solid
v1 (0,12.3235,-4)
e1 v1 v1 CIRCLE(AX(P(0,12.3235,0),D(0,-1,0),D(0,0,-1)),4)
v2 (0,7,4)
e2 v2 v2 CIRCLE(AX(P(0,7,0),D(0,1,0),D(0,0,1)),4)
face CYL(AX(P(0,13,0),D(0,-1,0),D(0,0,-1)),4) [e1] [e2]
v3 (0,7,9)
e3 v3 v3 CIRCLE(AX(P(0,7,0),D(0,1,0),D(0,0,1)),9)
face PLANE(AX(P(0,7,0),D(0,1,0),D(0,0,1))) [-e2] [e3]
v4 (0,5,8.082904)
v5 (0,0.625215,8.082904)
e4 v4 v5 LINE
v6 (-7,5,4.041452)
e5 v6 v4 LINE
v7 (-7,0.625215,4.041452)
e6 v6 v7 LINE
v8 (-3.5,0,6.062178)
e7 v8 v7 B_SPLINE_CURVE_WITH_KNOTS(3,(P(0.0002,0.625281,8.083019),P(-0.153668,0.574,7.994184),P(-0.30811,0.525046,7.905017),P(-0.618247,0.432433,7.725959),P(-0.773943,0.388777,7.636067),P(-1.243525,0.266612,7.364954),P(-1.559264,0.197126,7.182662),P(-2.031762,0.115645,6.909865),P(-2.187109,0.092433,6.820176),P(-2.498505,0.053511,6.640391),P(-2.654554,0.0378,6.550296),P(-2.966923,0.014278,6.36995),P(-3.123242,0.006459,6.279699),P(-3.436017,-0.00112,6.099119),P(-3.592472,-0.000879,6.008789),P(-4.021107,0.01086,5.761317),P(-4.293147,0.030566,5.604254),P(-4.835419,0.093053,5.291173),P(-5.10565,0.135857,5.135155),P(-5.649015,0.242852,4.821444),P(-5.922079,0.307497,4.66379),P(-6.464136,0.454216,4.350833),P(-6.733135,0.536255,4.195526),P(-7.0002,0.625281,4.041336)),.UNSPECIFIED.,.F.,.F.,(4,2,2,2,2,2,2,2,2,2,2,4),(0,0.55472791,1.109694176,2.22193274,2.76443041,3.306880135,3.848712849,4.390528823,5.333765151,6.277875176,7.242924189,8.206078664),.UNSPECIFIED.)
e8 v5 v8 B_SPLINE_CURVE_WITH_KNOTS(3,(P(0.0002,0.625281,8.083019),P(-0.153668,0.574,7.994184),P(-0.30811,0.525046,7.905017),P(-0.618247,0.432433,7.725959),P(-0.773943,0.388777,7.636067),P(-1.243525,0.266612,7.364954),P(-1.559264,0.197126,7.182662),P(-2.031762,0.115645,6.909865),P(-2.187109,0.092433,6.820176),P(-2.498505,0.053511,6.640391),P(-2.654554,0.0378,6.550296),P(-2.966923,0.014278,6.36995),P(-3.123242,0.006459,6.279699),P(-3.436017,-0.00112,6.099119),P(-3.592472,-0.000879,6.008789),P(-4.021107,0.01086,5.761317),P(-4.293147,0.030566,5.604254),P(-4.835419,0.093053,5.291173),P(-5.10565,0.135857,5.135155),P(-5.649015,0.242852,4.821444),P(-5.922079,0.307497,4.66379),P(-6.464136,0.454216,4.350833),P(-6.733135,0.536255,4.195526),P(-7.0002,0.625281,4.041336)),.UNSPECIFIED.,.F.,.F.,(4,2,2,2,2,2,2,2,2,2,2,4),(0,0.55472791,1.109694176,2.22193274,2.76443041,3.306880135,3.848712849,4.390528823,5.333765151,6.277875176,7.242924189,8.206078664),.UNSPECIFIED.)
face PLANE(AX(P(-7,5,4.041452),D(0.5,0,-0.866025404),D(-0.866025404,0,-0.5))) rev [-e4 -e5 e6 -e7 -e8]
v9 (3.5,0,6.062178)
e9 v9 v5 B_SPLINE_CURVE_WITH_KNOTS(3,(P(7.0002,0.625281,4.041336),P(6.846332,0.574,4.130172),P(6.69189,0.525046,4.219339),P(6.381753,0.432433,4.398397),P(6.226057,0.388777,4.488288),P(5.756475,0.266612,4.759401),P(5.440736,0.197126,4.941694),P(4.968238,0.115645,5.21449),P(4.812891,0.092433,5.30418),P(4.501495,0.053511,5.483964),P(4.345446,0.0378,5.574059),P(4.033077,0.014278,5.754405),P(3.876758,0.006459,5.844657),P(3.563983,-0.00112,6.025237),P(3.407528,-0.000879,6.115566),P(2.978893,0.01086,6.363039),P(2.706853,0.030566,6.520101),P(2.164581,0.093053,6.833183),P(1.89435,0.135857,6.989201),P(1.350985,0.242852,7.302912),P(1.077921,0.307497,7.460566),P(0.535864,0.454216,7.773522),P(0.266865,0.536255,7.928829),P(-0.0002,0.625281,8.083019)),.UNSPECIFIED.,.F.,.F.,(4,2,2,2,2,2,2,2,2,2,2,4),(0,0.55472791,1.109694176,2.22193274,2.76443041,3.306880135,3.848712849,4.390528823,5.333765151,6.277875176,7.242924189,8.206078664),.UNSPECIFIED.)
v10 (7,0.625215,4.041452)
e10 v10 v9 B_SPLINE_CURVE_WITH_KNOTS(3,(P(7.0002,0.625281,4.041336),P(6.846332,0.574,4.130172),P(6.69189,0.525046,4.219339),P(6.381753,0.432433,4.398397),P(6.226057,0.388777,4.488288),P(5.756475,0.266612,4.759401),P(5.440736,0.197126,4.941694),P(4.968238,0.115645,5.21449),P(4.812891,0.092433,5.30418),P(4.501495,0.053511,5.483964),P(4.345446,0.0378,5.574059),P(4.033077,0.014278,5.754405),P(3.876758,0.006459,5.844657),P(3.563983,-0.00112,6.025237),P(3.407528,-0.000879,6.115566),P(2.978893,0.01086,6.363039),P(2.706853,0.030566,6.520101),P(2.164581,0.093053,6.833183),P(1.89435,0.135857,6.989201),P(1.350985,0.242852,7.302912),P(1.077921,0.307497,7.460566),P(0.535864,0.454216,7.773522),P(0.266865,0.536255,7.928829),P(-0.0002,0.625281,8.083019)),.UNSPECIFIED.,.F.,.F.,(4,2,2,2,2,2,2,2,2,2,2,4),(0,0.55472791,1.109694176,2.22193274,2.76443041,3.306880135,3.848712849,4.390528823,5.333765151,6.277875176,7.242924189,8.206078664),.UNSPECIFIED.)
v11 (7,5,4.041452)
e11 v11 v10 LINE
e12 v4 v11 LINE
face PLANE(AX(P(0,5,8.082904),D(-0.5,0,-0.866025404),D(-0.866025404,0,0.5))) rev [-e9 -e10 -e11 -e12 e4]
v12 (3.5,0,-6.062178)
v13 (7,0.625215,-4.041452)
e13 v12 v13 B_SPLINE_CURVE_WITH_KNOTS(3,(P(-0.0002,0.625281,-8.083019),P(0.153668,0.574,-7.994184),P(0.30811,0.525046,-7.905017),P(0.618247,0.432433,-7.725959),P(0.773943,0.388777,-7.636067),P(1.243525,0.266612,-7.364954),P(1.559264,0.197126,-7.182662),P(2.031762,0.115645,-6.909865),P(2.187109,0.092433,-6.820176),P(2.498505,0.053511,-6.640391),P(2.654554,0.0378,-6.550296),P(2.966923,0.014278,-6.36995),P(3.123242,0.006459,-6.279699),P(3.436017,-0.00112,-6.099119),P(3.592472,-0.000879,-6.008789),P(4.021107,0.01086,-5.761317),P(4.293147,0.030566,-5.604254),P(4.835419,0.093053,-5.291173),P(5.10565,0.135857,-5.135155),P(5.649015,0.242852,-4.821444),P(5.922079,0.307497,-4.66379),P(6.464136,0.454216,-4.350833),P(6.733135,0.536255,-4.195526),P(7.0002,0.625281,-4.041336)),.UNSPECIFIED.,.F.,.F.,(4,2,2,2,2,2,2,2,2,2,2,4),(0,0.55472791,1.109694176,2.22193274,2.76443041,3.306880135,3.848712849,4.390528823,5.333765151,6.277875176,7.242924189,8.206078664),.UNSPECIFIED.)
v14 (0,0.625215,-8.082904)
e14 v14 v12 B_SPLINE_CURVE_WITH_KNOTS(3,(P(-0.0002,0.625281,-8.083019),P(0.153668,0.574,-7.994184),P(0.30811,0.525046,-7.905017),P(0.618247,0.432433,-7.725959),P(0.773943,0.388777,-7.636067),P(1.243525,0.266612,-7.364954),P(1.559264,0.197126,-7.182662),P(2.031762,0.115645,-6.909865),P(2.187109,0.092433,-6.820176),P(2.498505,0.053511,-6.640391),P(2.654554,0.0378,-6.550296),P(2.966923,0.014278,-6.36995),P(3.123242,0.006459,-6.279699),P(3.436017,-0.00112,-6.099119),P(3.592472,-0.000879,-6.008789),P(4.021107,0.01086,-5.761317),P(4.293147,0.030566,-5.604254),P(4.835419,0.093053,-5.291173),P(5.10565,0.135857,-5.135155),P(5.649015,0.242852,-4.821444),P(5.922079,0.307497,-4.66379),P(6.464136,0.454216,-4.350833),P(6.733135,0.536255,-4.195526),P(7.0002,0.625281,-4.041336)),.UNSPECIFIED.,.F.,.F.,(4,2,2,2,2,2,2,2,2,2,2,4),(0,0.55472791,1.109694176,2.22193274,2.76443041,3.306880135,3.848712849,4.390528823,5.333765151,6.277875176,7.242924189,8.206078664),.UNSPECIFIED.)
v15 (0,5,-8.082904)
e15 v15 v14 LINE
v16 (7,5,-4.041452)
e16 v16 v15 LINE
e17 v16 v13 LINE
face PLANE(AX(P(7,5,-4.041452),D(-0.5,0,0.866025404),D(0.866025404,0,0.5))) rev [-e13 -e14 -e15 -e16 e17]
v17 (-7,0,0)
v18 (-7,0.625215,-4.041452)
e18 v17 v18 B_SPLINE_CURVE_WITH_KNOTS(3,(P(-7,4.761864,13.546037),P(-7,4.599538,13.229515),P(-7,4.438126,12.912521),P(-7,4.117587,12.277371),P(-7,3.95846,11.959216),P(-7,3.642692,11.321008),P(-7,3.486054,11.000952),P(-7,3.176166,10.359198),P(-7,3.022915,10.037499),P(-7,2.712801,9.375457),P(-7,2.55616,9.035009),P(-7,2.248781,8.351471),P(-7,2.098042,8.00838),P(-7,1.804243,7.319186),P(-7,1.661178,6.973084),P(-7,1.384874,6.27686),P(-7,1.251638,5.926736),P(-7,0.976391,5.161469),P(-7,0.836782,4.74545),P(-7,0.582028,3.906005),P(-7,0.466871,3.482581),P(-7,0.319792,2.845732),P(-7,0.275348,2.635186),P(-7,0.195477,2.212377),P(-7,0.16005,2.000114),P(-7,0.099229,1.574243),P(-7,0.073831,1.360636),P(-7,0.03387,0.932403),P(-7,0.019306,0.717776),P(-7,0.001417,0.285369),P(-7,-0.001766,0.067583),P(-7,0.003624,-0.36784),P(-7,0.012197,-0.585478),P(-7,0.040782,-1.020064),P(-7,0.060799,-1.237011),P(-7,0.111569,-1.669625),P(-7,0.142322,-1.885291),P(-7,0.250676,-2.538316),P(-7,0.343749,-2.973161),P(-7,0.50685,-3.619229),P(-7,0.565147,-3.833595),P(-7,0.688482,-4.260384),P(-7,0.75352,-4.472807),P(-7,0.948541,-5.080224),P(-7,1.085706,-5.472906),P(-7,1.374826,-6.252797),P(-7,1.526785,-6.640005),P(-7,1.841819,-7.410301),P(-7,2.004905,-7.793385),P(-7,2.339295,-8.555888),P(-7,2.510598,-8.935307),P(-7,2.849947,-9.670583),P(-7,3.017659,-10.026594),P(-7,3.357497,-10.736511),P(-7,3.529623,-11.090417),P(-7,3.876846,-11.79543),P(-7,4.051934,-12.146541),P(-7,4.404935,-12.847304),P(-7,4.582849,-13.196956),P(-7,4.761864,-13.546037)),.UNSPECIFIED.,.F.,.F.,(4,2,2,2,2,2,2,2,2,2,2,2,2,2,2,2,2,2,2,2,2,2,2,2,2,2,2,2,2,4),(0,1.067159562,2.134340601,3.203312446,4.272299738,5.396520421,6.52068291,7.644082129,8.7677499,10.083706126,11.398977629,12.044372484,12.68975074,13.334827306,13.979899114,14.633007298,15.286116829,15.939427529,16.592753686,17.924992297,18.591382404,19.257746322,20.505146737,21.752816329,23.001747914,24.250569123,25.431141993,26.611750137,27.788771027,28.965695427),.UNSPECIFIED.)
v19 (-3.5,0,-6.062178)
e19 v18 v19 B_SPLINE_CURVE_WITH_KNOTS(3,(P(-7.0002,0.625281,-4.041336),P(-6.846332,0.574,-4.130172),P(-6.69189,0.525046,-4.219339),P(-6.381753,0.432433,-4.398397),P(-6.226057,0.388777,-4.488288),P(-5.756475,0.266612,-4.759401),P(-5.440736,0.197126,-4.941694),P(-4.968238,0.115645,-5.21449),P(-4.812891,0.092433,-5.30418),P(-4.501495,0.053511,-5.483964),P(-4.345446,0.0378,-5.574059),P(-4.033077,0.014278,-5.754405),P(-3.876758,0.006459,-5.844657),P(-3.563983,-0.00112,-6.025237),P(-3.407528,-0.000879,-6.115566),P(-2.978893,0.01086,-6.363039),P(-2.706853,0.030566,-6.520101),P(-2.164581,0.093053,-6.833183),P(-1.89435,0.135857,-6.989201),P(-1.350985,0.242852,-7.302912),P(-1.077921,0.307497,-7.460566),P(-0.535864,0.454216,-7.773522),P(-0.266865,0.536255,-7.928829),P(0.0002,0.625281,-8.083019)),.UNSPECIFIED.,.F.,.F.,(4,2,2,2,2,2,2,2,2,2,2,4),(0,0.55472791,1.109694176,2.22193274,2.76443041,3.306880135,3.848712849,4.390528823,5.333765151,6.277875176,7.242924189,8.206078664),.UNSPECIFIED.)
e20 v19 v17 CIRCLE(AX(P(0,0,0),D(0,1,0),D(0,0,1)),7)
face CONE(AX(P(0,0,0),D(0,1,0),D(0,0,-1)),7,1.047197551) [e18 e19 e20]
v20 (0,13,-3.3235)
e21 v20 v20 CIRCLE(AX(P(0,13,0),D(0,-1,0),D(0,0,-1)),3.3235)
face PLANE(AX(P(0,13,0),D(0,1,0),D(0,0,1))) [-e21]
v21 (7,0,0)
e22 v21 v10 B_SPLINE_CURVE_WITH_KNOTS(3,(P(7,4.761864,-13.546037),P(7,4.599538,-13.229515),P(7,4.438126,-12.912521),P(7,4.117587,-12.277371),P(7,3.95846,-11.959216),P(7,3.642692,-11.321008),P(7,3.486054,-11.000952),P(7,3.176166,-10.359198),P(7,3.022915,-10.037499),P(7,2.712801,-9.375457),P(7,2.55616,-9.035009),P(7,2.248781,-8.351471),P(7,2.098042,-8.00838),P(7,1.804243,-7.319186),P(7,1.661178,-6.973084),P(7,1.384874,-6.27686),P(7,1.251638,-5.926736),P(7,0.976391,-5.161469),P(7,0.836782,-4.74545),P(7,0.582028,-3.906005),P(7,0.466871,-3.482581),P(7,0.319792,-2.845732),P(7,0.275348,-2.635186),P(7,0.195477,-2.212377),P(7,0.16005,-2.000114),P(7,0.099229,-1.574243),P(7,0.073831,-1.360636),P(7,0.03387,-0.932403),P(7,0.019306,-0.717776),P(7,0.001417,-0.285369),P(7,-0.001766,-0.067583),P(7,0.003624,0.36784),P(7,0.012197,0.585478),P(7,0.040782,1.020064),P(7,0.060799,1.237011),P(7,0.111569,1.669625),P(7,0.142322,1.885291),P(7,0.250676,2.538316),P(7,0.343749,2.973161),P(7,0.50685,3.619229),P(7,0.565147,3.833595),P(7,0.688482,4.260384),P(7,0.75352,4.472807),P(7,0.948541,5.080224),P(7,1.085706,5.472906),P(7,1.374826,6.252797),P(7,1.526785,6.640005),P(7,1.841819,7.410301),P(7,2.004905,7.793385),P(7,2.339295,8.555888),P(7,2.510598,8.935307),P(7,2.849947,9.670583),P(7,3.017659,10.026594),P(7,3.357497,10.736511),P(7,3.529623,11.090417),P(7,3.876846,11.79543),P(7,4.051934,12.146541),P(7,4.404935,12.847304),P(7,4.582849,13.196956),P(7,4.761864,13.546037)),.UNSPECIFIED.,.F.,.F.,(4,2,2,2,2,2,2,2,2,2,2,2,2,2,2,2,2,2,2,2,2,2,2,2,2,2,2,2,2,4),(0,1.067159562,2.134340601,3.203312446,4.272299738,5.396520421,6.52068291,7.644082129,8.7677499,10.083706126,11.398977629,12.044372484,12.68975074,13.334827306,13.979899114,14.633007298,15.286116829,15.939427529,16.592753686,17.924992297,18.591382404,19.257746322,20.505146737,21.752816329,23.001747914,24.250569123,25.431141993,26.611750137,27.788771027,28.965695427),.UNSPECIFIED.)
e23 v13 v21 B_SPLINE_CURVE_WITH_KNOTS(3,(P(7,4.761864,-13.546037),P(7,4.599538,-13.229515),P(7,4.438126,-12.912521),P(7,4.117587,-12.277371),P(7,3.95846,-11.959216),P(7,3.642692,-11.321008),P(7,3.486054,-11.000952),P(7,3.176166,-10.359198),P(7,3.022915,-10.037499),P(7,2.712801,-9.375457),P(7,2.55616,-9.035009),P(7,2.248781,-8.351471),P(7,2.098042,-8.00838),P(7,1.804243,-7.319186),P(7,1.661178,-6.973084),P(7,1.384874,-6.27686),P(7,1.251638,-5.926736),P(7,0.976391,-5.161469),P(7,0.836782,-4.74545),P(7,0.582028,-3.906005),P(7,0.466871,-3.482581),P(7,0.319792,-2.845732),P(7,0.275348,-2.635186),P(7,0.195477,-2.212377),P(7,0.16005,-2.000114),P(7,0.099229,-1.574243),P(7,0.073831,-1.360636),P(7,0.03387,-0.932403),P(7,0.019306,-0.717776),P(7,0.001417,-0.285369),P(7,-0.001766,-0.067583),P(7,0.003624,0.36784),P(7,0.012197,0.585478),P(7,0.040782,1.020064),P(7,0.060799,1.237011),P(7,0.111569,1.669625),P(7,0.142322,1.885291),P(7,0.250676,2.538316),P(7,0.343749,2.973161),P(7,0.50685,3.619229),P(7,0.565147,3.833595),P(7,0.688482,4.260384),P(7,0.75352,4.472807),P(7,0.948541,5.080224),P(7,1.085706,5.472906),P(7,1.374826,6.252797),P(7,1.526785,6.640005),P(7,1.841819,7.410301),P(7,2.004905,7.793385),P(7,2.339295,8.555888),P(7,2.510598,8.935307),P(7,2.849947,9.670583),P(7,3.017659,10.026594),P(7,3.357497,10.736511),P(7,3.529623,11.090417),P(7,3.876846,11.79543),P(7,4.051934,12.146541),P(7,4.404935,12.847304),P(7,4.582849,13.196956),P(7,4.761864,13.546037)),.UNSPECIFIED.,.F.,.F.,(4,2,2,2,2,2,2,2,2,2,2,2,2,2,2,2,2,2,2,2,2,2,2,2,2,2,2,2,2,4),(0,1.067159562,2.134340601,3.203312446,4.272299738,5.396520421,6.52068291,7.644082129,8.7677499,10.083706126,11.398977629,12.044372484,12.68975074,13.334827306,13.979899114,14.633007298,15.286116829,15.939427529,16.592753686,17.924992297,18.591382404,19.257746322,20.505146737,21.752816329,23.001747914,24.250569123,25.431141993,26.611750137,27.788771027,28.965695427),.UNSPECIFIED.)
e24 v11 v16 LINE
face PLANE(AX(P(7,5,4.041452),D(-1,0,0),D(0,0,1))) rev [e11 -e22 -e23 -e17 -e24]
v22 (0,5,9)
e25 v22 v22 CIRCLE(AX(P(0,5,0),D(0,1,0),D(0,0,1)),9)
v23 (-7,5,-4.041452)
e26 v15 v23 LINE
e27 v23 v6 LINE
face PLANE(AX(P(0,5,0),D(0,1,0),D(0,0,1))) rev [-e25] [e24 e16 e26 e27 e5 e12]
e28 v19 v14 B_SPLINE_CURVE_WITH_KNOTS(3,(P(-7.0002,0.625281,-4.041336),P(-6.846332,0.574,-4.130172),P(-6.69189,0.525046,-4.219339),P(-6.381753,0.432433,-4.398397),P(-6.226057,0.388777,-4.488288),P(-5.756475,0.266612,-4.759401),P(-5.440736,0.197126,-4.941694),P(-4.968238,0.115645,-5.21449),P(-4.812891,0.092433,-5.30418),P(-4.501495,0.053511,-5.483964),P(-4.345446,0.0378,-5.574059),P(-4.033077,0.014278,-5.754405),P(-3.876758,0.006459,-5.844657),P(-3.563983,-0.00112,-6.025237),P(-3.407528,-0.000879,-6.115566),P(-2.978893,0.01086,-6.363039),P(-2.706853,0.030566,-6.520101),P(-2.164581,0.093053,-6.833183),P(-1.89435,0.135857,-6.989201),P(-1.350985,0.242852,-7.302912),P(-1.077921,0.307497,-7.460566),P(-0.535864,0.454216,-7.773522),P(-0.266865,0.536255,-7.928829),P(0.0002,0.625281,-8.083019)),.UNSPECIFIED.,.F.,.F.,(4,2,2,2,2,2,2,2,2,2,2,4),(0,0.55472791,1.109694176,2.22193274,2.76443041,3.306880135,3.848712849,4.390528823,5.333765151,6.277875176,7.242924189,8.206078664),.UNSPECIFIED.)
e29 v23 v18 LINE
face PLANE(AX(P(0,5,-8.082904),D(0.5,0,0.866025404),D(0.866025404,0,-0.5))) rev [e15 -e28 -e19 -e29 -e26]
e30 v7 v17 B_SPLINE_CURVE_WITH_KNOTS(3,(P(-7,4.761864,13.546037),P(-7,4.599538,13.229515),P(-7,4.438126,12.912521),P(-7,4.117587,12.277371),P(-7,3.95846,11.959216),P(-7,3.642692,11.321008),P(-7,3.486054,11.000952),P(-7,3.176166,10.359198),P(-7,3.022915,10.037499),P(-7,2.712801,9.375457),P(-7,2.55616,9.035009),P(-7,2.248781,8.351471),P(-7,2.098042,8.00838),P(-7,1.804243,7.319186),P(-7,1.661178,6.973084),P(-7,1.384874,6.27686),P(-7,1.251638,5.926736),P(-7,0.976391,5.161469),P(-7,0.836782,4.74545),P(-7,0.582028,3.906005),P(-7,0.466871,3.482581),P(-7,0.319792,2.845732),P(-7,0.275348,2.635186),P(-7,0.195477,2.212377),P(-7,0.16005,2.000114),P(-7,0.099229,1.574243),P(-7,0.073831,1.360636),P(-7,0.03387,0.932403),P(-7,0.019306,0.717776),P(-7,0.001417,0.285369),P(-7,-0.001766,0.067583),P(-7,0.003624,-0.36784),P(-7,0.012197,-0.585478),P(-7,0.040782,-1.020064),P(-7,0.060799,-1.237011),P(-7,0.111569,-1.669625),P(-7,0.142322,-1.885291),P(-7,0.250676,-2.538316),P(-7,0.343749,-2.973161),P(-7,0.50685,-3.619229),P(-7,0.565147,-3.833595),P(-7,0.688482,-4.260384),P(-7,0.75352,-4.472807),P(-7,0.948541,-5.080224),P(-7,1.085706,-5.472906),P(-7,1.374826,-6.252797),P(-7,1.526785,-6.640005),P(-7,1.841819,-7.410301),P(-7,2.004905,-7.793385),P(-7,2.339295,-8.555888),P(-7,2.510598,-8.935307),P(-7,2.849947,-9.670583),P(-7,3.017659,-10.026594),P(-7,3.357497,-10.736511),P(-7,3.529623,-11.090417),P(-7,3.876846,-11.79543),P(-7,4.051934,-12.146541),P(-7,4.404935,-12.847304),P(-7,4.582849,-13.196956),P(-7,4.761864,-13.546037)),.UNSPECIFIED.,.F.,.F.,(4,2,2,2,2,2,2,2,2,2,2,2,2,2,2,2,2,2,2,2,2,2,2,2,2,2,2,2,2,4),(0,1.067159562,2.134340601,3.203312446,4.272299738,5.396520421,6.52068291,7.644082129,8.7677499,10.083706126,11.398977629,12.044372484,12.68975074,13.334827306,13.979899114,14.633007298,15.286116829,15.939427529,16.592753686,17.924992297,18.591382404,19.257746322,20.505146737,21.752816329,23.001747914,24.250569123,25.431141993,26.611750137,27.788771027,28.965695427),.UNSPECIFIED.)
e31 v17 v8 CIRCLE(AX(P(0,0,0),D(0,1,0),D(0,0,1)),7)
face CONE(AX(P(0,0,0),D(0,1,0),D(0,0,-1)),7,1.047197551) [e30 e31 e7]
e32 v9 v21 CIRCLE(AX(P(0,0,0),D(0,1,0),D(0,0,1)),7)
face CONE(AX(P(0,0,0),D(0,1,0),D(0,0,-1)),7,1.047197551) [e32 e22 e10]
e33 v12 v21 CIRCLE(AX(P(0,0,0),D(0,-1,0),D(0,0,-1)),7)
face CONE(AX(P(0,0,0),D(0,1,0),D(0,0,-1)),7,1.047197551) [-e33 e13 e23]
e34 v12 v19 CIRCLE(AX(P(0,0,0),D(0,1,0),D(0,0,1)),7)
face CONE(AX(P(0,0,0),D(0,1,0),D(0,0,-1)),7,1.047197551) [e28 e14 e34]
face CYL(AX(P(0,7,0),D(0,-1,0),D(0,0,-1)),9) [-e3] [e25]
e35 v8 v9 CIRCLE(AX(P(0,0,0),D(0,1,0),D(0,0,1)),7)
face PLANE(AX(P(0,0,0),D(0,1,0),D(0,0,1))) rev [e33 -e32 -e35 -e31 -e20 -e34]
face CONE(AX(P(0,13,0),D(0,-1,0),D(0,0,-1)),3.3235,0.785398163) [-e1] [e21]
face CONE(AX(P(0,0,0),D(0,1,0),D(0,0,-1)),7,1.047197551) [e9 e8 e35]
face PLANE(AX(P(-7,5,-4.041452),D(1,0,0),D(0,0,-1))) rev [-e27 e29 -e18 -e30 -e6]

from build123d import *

# Parameters (mm, degrees)
EXTRUDE_1_DEPTH     = 5
SKETCH_3_OUTSIDE_W  = 64.746
SKETCH_3_OUTSIDE_H  = 66.912
SKETCH_3_OUTSIDE_R  = 7
CUT_EXTRUDE_1_DEPTH = 12.80395414
CUT_EXTRUDE_1_DRAFT = -60
SKETCH_4_R          = 9
EXTRUDE_2_DEPTH     = 2
SKETCH_5_R          = 4
EXTRUDE_3_DEPTH     = 6


# Read off the part's stored shape, not the designer's step: M8 机械螺纹 螺柱1
with BuildPart() as part:
    # 草图1 → 凸台-拉伸1 (new body)
    with BuildSketch(Plane(origin=(0, 0, 0), x_dir=(1, 0, 0), z_dir=(0, 1, 0))):
        Polygon((7, -4.041451884), (7, 4.041451884), (0, 8.082903769), (-7, 4.041451884), (-7, -4.041451884), (0, -8.082903769), align=None)
    extrude(amount=EXTRUDE_1_DEPTH)


with BuildPart() as cut_extrude_1_tool:
    # 草图3 outside → 切除-拉伸1 (with draft: the straight prism first)
    with BuildSketch(Plane.XZ):
        Rectangle(SKETCH_3_OUTSIDE_W, SKETCH_3_OUTSIDE_H)
        Circle(SKETCH_3_OUTSIDE_R, mode=Mode.SUBTRACT)
    extrude(amount=-CUT_EXTRUDE_1_DEPTH)
    # 切除-拉伸1: the draft: its side faces are tilted about the plane it starts from
    cut_extrude_1_sides = [cut_extrude_1_tool.faces().sort_by_distance(p)[0] for p in [
        (0, 6.40197707, -33.456),
        (32.373, 6.40197707, 0),
        (0, 6.40197707, 33.456),
        (-32.373, 6.40197707, 0),
        (-7, 6.40197707, 0),
    ]]
    draft(cut_extrude_1_sides, Plane.XZ, CUT_EXTRUDE_1_DRAFT)


with BuildPart() as part_1:
    add(part.part)

    # 切除-拉伸1: cut by cut_extrude_1_tool
    add(cut_extrude_1_tool.part, mode=Mode.SUBTRACT)

    # 草图4 → 凸台-拉伸2 (add)
    with BuildSketch(Plane(origin=(0, 5, 0), x_dir=(1, 0, 0), z_dir=(0, 1, 0))):
        with Locations(Location((0, 0, 0), (0, 0, 270))):
            Circle(SKETCH_4_R)
    extrude(amount=EXTRUDE_2_DEPTH)

    # 草图5 → 凸台-拉伸3 (add)
    with BuildSketch(Plane(origin=(0, 7, 0), x_dir=(1, 0, 0), z_dir=(0, 1, 0))):
        with Locations(Location((0, 0, 0), (0, 0, 270))):
            Circle(SKETCH_5_R)
    extrude(amount=EXTRUDE_3_DEPTH)

    # M8 机械螺纹 螺柱1 outline → M8 机械螺纹 螺柱1 (revolve, cut)
    with BuildSketch(Plane.XY):
        Polygon((4, 13), (3.3235, 13), (4, 12.3235), align=None)
    revolve(axis=Axis((0, 0, 0), (0, 1, 0)), mode=Mode.SUBTRACT)


solid = part_1.part
